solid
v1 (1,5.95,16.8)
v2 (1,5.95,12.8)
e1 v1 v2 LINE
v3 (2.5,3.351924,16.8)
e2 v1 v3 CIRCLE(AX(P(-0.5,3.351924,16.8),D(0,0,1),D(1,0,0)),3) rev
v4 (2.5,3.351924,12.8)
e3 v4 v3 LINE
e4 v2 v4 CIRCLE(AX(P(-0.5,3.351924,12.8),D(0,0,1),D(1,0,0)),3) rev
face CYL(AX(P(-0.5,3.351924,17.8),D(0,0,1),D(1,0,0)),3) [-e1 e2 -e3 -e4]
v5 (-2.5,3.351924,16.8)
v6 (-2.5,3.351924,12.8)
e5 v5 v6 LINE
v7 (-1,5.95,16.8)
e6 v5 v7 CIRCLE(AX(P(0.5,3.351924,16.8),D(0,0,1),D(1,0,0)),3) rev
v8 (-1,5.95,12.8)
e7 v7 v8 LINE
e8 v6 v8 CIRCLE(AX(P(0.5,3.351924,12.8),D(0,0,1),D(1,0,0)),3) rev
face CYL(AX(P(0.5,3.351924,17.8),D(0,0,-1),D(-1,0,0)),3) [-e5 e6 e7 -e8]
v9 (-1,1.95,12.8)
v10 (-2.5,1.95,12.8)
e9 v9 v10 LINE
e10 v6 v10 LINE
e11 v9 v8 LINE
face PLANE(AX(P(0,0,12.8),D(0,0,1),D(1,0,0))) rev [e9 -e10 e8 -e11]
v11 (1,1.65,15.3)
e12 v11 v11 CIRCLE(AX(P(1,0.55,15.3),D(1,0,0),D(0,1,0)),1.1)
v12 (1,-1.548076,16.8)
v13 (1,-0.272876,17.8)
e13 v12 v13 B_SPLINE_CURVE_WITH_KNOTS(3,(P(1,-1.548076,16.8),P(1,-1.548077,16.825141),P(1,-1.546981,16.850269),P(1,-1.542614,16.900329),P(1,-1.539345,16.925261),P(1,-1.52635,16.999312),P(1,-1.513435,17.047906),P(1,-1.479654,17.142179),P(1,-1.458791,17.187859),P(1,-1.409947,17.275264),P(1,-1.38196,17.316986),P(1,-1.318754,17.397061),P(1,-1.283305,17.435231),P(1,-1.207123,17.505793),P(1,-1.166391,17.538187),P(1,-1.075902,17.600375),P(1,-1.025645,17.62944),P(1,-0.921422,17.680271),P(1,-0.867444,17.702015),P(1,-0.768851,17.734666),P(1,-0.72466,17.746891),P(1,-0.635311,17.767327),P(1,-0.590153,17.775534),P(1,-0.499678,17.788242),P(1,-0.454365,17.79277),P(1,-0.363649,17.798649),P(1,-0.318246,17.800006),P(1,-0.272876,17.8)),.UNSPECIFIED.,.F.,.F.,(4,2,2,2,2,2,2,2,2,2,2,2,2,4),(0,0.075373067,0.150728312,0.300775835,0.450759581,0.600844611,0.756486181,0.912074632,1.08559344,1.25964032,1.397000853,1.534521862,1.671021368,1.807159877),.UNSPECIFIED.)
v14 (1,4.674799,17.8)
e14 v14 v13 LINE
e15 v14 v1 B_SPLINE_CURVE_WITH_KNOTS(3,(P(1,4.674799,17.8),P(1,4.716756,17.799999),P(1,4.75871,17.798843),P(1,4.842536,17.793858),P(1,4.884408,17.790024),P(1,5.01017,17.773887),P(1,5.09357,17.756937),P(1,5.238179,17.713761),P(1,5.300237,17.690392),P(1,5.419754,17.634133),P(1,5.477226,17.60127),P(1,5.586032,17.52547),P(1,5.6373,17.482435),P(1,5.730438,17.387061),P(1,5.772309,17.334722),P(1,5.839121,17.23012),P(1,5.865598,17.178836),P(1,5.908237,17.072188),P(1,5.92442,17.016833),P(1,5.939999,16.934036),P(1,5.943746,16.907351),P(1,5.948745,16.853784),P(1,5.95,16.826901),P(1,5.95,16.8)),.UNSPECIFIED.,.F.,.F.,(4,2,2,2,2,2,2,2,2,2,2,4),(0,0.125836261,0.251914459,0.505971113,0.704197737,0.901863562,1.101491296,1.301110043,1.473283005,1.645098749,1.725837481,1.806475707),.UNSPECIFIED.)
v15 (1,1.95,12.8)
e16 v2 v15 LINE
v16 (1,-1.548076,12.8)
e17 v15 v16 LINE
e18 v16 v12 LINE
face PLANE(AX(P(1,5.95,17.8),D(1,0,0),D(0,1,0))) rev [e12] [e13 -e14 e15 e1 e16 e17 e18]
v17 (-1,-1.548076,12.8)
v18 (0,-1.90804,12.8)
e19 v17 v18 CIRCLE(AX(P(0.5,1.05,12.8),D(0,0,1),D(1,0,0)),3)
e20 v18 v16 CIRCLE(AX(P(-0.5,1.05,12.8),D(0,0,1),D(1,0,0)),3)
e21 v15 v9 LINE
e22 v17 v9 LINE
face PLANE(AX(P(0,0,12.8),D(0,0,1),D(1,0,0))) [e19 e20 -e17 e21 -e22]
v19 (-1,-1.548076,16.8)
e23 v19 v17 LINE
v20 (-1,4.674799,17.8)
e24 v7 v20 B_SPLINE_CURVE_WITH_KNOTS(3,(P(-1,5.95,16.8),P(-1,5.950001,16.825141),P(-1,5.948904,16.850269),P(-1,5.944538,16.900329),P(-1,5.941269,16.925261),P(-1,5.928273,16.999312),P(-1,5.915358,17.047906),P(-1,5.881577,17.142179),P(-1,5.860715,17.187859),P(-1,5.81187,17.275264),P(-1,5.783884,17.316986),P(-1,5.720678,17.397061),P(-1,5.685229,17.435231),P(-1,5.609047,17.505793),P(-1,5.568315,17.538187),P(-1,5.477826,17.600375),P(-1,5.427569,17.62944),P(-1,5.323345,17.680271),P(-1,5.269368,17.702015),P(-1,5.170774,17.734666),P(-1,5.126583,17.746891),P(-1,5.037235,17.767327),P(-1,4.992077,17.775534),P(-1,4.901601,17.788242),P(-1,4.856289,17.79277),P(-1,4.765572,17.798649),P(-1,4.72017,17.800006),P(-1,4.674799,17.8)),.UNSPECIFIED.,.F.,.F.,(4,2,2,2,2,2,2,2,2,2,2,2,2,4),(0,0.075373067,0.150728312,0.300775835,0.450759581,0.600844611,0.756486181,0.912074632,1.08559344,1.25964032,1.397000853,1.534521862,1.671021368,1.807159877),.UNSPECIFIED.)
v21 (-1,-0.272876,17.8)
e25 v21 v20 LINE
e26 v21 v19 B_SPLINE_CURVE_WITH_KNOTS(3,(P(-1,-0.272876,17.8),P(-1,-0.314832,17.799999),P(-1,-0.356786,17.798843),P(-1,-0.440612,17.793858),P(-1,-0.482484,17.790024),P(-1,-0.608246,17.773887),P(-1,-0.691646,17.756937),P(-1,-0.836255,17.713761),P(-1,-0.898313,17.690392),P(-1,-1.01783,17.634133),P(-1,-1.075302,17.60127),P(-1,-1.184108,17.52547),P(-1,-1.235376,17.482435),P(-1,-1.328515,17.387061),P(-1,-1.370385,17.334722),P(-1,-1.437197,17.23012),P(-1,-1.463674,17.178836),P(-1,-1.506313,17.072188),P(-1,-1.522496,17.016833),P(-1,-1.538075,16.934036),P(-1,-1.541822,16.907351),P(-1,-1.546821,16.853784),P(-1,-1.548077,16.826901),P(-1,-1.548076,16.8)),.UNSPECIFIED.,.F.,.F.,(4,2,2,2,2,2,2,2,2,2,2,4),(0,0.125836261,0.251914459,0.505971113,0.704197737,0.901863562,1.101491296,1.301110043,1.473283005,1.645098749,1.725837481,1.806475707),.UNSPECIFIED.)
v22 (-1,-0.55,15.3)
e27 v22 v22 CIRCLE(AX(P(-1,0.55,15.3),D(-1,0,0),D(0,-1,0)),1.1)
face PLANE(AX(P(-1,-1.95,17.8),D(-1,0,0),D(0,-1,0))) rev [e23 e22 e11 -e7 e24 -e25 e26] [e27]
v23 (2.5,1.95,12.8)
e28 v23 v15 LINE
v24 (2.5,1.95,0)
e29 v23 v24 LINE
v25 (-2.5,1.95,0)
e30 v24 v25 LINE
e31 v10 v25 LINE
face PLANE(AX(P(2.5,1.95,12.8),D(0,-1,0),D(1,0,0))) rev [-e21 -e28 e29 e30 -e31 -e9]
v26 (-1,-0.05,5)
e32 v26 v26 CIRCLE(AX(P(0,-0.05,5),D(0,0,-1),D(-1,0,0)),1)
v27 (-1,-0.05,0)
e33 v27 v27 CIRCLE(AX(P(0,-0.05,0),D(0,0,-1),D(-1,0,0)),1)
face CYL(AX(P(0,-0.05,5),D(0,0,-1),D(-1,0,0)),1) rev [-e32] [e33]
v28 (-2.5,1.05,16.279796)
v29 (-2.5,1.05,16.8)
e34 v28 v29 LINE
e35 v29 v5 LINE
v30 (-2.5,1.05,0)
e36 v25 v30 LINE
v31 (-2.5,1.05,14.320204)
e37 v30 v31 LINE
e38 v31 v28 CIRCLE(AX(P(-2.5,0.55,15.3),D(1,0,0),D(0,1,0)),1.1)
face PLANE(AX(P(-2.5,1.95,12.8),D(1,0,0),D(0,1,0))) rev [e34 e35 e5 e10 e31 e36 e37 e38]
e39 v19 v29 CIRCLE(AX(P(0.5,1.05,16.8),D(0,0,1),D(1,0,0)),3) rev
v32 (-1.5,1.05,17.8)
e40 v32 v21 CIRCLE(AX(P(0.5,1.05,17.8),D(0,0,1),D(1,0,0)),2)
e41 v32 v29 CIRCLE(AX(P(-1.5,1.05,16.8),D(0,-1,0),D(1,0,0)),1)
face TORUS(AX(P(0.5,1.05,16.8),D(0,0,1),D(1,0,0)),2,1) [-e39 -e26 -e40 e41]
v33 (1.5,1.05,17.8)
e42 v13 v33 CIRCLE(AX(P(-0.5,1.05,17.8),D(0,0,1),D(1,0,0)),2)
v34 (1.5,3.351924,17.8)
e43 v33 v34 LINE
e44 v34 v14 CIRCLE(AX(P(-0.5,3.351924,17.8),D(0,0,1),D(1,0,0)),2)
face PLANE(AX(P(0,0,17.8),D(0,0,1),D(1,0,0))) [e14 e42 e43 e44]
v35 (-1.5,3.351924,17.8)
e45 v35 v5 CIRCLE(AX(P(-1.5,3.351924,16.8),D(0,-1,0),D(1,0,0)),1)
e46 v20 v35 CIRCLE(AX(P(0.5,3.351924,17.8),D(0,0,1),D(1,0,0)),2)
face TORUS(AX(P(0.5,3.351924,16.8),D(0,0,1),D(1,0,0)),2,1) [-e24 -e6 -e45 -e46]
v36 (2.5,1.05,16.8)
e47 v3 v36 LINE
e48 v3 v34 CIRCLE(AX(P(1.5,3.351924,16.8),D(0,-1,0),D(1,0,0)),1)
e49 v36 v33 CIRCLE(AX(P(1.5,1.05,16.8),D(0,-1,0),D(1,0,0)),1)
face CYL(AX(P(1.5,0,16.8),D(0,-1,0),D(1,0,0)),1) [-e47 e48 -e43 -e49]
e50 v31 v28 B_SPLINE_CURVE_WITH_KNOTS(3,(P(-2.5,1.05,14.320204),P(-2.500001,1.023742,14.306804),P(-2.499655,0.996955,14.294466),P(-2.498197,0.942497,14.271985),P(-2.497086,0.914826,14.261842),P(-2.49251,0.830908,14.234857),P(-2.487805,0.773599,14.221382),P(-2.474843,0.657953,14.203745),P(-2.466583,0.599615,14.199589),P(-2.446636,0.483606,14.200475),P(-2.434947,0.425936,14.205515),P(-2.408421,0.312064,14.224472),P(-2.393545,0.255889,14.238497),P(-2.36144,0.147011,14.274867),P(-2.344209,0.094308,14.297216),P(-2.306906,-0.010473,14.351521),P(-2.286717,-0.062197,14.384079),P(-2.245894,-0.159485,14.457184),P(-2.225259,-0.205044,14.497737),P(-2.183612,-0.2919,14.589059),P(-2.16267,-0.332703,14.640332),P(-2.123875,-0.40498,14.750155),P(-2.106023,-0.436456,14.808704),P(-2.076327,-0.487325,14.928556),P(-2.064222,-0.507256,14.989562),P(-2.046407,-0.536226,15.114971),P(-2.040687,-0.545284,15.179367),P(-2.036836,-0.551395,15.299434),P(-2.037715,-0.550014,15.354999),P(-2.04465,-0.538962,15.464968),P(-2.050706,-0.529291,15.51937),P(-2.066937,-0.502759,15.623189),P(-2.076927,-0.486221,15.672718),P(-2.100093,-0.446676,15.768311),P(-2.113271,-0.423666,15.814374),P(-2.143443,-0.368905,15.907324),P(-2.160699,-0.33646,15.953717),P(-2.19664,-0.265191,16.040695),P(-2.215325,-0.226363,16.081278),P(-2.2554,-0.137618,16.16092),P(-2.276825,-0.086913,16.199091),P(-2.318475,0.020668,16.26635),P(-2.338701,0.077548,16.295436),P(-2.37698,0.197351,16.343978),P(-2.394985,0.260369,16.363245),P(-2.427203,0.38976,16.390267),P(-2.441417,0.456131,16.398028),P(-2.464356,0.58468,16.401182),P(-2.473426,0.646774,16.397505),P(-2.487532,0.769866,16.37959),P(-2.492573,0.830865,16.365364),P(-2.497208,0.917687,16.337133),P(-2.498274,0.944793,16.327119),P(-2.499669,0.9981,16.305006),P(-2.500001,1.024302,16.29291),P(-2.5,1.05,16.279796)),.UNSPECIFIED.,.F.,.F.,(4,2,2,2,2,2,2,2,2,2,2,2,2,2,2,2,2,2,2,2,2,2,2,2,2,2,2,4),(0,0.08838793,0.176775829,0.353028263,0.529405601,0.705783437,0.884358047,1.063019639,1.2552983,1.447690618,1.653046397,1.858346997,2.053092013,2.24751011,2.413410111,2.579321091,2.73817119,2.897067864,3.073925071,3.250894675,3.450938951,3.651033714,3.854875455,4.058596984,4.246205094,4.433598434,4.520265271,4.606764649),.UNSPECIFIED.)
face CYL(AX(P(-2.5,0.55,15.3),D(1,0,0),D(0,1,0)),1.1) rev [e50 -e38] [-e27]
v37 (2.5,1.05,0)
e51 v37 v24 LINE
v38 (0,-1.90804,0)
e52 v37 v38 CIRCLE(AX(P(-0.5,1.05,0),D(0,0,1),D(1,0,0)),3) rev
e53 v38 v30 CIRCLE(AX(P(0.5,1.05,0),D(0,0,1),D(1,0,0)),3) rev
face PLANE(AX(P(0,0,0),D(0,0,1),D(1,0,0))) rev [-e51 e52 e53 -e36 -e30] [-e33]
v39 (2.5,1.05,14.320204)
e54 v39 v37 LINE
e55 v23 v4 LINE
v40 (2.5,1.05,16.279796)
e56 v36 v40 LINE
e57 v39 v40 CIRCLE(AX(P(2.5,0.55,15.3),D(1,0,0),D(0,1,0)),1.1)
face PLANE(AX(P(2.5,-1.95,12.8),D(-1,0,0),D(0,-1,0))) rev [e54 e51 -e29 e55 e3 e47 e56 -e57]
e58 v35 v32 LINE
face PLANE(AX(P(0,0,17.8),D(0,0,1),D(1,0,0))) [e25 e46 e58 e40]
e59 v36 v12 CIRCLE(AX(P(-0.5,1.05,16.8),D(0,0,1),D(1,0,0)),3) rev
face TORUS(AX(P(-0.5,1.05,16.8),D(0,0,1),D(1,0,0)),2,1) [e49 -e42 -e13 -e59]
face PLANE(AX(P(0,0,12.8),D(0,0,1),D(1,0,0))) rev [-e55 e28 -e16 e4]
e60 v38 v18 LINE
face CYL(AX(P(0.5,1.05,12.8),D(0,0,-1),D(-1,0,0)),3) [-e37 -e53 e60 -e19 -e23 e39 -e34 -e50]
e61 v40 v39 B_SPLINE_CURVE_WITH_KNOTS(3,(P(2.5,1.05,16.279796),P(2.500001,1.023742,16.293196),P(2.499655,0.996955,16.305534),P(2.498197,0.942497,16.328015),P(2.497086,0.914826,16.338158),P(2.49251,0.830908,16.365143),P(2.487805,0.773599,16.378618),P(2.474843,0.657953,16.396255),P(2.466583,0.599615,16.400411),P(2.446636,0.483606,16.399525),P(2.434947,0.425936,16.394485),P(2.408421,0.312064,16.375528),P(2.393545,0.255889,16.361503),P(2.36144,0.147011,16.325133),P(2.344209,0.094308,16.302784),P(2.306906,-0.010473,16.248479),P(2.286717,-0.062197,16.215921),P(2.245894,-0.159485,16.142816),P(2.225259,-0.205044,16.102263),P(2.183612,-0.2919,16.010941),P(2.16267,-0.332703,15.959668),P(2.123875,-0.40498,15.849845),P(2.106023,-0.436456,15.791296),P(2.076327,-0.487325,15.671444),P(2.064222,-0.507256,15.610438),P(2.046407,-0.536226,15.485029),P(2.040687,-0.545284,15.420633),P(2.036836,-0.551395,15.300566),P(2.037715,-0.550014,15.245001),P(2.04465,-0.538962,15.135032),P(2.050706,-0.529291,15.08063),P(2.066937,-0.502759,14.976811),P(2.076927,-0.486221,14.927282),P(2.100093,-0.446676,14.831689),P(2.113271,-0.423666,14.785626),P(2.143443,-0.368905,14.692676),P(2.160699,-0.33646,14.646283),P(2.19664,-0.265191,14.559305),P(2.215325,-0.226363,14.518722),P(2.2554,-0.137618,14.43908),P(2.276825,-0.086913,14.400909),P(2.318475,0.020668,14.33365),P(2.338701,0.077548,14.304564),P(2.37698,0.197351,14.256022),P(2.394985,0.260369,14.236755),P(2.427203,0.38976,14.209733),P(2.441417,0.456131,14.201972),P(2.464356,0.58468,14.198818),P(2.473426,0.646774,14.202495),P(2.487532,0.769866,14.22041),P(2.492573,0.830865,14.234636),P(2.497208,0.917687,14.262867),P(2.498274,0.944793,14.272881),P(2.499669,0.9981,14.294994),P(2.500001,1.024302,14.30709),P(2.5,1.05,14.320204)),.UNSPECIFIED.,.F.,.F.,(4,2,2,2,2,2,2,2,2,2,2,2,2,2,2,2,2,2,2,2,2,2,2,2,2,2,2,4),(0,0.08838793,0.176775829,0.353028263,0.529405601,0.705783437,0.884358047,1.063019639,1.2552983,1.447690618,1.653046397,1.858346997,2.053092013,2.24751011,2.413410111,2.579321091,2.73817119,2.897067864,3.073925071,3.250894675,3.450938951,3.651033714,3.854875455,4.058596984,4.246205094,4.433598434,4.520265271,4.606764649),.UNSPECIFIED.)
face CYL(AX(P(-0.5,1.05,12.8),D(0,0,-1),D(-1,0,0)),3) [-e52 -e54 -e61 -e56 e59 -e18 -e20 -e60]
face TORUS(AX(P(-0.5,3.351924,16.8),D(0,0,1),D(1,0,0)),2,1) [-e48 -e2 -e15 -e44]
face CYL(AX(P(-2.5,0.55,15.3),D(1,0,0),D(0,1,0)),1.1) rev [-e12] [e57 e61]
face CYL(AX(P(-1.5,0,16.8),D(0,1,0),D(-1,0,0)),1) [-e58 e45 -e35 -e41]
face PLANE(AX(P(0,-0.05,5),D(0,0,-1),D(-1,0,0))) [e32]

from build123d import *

# Parameters (mm, degrees)
SKETCH_1_W          = 5
SKETCH_1_H          = 3.9
EXTRUDE_1_DEPTH     = 12.8
SKETCH_2_R          = 1
CUT_EXTRUDE_1_DEPTH = 5
SKETCH_3_W          = 1.5
SKETCH_3_H          = 7.9
EXTRUDE_2_DEPTH     = 5
SKETCH_4_R          = 1.1
CUT_EXTRUDE_2_DEPTH = 5
FILLET_1_R          = 3
FILLET_2_R          = 3
FILLET_3_R          = 1


with BuildPart() as part:
    # 草图1 → 凸台-拉伸1 (new body)
    with BuildSketch(Plane.XY):
        Rectangle(SKETCH_1_W, SKETCH_1_H)
    extrude(amount=EXTRUDE_1_DEPTH)

    # 草图2 → 切除-拉伸1 (cut)
    with BuildSketch(Plane(origin=(0, 0, 0), x_dir=(-1, 0, 0), z_dir=(0, 0, -1))):
        with Locations((0, -0.05)):
            Circle(SKETCH_2_R)
    extrude(amount=-CUT_EXTRUDE_1_DEPTH, mode=Mode.SUBTRACT)

    # 草图3 → 凸台-拉伸2 (add)
    with BuildSketch(Plane.XY.offset(12.8)):
        with Locations((1.75, 2)):
            Rectangle(SKETCH_3_W, SKETCH_3_H)
        with Locations((-1.75, 2)):
            Rectangle(SKETCH_3_W, SKETCH_3_H)
    extrude(amount=EXTRUDE_2_DEPTH)

    # 草图4 → 切除-拉伸2 (cut)
    with BuildSketch(Plane(origin=(2.5, 0, 0), x_dir=(0, 0, -1), z_dir=(1, 0, 0))):
        with Locations(Location((-15.3, 0.55, 0), (0, 0, 90))):
            Circle(SKETCH_4_R)
    extrude(amount=-CUT_EXTRUDE_2_DEPTH, mode=Mode.SUBTRACT)

    # 圆角1
    # the kernel refuses this fillet: 3 mm, written as the material it takes off along each edge
    with BuildSketch(Plane(origin=(-2.5, -1.95, -7.5), x_dir=(0, 1, 0), z_dir=(0, 0, 1)), Plane(origin=(2.5, -1.95, 25.3), x_dir=(0, 1, 0), z_dir=(0, 0, -1))) as fillet_1_piece_1:
        with BuildLine():
            CenterArc((FILLET_1_R, -FILLET_1_R), FILLET_1_R, 90, 90)
            Line((0, -FILLET_1_R), (0, 0))
            Line((0, 0), (FILLET_1_R, 0))
        make_face()
    extrude(amount=32.8, mode=Mode.SUBTRACT)

    # 圆角2
    # the kernel refuses this fillet: 3 mm, written as the material it takes off along each edge
    with BuildSketch(Plane(origin=(2.5, 5.95, 6.304809472), x_dir=(0, -1, 0), z_dir=(0, 0, 1))) as fillet_2_piece_1:
        with BuildLine():
            CenterArc((2.598076211, -3), FILLET_2_R, 90, 60)
            Line((0, -1.5), (-0.051961524, -1.47))
            ThreePointArc((-0.051961524, -1.47), (-0.06, -0.75), (-0.06, 0))
            Line((-0.06, 0), (0, 0.06))
            Line((0, 0.06), (2.598076211, 0.06))
            Line((2.598076211, 0.06), (2.598076211, 0))
        make_face()
    extrude(amount=17.990381057, mode=Mode.SUBTRACT)
    with BuildSketch(Plane(origin=(-2.5, 5.95, 6.304809472), x_dir=(0, -1, 0), z_dir=(0, 0, 1))) as fillet_2_piece_2:
        with BuildLine():
            CenterArc((2.598076211, 3), FILLET_2_R, 210, 60)
            Line((0, 1.5), (-0.051961524, 1.47))
            ThreePointArc((-0.051961524, 1.47), (-0.06, 0.75), (-0.06, 0))
            Line((-0.06, 0), (0, -0.06))
            Line((0, -0.06), (2.598076211, -0.06))
            Line((2.598076211, -0.06), (2.598076211, 0))
        make_face()
    extrude(amount=17.990381057, mode=Mode.SUBTRACT)

    # 圆角3
    fillet_3_edges = [part.edges().sort_by_distance(p)[0] for p in [
        (-2.098076211, -0.45, 17.8),
        (2.5, 2.200961894, 17.8),
        (2.098076211, -0.45, 17.8),
        (2.098076211, 4.851923789, 17.8),
        (-2.5, 2.200961894, 17.8),
        (-2.098076211, 4.851923789, 17.8),
    ]]
    fillet(fillet_3_edges, radius=FILLET_3_R)


solid = part.part
